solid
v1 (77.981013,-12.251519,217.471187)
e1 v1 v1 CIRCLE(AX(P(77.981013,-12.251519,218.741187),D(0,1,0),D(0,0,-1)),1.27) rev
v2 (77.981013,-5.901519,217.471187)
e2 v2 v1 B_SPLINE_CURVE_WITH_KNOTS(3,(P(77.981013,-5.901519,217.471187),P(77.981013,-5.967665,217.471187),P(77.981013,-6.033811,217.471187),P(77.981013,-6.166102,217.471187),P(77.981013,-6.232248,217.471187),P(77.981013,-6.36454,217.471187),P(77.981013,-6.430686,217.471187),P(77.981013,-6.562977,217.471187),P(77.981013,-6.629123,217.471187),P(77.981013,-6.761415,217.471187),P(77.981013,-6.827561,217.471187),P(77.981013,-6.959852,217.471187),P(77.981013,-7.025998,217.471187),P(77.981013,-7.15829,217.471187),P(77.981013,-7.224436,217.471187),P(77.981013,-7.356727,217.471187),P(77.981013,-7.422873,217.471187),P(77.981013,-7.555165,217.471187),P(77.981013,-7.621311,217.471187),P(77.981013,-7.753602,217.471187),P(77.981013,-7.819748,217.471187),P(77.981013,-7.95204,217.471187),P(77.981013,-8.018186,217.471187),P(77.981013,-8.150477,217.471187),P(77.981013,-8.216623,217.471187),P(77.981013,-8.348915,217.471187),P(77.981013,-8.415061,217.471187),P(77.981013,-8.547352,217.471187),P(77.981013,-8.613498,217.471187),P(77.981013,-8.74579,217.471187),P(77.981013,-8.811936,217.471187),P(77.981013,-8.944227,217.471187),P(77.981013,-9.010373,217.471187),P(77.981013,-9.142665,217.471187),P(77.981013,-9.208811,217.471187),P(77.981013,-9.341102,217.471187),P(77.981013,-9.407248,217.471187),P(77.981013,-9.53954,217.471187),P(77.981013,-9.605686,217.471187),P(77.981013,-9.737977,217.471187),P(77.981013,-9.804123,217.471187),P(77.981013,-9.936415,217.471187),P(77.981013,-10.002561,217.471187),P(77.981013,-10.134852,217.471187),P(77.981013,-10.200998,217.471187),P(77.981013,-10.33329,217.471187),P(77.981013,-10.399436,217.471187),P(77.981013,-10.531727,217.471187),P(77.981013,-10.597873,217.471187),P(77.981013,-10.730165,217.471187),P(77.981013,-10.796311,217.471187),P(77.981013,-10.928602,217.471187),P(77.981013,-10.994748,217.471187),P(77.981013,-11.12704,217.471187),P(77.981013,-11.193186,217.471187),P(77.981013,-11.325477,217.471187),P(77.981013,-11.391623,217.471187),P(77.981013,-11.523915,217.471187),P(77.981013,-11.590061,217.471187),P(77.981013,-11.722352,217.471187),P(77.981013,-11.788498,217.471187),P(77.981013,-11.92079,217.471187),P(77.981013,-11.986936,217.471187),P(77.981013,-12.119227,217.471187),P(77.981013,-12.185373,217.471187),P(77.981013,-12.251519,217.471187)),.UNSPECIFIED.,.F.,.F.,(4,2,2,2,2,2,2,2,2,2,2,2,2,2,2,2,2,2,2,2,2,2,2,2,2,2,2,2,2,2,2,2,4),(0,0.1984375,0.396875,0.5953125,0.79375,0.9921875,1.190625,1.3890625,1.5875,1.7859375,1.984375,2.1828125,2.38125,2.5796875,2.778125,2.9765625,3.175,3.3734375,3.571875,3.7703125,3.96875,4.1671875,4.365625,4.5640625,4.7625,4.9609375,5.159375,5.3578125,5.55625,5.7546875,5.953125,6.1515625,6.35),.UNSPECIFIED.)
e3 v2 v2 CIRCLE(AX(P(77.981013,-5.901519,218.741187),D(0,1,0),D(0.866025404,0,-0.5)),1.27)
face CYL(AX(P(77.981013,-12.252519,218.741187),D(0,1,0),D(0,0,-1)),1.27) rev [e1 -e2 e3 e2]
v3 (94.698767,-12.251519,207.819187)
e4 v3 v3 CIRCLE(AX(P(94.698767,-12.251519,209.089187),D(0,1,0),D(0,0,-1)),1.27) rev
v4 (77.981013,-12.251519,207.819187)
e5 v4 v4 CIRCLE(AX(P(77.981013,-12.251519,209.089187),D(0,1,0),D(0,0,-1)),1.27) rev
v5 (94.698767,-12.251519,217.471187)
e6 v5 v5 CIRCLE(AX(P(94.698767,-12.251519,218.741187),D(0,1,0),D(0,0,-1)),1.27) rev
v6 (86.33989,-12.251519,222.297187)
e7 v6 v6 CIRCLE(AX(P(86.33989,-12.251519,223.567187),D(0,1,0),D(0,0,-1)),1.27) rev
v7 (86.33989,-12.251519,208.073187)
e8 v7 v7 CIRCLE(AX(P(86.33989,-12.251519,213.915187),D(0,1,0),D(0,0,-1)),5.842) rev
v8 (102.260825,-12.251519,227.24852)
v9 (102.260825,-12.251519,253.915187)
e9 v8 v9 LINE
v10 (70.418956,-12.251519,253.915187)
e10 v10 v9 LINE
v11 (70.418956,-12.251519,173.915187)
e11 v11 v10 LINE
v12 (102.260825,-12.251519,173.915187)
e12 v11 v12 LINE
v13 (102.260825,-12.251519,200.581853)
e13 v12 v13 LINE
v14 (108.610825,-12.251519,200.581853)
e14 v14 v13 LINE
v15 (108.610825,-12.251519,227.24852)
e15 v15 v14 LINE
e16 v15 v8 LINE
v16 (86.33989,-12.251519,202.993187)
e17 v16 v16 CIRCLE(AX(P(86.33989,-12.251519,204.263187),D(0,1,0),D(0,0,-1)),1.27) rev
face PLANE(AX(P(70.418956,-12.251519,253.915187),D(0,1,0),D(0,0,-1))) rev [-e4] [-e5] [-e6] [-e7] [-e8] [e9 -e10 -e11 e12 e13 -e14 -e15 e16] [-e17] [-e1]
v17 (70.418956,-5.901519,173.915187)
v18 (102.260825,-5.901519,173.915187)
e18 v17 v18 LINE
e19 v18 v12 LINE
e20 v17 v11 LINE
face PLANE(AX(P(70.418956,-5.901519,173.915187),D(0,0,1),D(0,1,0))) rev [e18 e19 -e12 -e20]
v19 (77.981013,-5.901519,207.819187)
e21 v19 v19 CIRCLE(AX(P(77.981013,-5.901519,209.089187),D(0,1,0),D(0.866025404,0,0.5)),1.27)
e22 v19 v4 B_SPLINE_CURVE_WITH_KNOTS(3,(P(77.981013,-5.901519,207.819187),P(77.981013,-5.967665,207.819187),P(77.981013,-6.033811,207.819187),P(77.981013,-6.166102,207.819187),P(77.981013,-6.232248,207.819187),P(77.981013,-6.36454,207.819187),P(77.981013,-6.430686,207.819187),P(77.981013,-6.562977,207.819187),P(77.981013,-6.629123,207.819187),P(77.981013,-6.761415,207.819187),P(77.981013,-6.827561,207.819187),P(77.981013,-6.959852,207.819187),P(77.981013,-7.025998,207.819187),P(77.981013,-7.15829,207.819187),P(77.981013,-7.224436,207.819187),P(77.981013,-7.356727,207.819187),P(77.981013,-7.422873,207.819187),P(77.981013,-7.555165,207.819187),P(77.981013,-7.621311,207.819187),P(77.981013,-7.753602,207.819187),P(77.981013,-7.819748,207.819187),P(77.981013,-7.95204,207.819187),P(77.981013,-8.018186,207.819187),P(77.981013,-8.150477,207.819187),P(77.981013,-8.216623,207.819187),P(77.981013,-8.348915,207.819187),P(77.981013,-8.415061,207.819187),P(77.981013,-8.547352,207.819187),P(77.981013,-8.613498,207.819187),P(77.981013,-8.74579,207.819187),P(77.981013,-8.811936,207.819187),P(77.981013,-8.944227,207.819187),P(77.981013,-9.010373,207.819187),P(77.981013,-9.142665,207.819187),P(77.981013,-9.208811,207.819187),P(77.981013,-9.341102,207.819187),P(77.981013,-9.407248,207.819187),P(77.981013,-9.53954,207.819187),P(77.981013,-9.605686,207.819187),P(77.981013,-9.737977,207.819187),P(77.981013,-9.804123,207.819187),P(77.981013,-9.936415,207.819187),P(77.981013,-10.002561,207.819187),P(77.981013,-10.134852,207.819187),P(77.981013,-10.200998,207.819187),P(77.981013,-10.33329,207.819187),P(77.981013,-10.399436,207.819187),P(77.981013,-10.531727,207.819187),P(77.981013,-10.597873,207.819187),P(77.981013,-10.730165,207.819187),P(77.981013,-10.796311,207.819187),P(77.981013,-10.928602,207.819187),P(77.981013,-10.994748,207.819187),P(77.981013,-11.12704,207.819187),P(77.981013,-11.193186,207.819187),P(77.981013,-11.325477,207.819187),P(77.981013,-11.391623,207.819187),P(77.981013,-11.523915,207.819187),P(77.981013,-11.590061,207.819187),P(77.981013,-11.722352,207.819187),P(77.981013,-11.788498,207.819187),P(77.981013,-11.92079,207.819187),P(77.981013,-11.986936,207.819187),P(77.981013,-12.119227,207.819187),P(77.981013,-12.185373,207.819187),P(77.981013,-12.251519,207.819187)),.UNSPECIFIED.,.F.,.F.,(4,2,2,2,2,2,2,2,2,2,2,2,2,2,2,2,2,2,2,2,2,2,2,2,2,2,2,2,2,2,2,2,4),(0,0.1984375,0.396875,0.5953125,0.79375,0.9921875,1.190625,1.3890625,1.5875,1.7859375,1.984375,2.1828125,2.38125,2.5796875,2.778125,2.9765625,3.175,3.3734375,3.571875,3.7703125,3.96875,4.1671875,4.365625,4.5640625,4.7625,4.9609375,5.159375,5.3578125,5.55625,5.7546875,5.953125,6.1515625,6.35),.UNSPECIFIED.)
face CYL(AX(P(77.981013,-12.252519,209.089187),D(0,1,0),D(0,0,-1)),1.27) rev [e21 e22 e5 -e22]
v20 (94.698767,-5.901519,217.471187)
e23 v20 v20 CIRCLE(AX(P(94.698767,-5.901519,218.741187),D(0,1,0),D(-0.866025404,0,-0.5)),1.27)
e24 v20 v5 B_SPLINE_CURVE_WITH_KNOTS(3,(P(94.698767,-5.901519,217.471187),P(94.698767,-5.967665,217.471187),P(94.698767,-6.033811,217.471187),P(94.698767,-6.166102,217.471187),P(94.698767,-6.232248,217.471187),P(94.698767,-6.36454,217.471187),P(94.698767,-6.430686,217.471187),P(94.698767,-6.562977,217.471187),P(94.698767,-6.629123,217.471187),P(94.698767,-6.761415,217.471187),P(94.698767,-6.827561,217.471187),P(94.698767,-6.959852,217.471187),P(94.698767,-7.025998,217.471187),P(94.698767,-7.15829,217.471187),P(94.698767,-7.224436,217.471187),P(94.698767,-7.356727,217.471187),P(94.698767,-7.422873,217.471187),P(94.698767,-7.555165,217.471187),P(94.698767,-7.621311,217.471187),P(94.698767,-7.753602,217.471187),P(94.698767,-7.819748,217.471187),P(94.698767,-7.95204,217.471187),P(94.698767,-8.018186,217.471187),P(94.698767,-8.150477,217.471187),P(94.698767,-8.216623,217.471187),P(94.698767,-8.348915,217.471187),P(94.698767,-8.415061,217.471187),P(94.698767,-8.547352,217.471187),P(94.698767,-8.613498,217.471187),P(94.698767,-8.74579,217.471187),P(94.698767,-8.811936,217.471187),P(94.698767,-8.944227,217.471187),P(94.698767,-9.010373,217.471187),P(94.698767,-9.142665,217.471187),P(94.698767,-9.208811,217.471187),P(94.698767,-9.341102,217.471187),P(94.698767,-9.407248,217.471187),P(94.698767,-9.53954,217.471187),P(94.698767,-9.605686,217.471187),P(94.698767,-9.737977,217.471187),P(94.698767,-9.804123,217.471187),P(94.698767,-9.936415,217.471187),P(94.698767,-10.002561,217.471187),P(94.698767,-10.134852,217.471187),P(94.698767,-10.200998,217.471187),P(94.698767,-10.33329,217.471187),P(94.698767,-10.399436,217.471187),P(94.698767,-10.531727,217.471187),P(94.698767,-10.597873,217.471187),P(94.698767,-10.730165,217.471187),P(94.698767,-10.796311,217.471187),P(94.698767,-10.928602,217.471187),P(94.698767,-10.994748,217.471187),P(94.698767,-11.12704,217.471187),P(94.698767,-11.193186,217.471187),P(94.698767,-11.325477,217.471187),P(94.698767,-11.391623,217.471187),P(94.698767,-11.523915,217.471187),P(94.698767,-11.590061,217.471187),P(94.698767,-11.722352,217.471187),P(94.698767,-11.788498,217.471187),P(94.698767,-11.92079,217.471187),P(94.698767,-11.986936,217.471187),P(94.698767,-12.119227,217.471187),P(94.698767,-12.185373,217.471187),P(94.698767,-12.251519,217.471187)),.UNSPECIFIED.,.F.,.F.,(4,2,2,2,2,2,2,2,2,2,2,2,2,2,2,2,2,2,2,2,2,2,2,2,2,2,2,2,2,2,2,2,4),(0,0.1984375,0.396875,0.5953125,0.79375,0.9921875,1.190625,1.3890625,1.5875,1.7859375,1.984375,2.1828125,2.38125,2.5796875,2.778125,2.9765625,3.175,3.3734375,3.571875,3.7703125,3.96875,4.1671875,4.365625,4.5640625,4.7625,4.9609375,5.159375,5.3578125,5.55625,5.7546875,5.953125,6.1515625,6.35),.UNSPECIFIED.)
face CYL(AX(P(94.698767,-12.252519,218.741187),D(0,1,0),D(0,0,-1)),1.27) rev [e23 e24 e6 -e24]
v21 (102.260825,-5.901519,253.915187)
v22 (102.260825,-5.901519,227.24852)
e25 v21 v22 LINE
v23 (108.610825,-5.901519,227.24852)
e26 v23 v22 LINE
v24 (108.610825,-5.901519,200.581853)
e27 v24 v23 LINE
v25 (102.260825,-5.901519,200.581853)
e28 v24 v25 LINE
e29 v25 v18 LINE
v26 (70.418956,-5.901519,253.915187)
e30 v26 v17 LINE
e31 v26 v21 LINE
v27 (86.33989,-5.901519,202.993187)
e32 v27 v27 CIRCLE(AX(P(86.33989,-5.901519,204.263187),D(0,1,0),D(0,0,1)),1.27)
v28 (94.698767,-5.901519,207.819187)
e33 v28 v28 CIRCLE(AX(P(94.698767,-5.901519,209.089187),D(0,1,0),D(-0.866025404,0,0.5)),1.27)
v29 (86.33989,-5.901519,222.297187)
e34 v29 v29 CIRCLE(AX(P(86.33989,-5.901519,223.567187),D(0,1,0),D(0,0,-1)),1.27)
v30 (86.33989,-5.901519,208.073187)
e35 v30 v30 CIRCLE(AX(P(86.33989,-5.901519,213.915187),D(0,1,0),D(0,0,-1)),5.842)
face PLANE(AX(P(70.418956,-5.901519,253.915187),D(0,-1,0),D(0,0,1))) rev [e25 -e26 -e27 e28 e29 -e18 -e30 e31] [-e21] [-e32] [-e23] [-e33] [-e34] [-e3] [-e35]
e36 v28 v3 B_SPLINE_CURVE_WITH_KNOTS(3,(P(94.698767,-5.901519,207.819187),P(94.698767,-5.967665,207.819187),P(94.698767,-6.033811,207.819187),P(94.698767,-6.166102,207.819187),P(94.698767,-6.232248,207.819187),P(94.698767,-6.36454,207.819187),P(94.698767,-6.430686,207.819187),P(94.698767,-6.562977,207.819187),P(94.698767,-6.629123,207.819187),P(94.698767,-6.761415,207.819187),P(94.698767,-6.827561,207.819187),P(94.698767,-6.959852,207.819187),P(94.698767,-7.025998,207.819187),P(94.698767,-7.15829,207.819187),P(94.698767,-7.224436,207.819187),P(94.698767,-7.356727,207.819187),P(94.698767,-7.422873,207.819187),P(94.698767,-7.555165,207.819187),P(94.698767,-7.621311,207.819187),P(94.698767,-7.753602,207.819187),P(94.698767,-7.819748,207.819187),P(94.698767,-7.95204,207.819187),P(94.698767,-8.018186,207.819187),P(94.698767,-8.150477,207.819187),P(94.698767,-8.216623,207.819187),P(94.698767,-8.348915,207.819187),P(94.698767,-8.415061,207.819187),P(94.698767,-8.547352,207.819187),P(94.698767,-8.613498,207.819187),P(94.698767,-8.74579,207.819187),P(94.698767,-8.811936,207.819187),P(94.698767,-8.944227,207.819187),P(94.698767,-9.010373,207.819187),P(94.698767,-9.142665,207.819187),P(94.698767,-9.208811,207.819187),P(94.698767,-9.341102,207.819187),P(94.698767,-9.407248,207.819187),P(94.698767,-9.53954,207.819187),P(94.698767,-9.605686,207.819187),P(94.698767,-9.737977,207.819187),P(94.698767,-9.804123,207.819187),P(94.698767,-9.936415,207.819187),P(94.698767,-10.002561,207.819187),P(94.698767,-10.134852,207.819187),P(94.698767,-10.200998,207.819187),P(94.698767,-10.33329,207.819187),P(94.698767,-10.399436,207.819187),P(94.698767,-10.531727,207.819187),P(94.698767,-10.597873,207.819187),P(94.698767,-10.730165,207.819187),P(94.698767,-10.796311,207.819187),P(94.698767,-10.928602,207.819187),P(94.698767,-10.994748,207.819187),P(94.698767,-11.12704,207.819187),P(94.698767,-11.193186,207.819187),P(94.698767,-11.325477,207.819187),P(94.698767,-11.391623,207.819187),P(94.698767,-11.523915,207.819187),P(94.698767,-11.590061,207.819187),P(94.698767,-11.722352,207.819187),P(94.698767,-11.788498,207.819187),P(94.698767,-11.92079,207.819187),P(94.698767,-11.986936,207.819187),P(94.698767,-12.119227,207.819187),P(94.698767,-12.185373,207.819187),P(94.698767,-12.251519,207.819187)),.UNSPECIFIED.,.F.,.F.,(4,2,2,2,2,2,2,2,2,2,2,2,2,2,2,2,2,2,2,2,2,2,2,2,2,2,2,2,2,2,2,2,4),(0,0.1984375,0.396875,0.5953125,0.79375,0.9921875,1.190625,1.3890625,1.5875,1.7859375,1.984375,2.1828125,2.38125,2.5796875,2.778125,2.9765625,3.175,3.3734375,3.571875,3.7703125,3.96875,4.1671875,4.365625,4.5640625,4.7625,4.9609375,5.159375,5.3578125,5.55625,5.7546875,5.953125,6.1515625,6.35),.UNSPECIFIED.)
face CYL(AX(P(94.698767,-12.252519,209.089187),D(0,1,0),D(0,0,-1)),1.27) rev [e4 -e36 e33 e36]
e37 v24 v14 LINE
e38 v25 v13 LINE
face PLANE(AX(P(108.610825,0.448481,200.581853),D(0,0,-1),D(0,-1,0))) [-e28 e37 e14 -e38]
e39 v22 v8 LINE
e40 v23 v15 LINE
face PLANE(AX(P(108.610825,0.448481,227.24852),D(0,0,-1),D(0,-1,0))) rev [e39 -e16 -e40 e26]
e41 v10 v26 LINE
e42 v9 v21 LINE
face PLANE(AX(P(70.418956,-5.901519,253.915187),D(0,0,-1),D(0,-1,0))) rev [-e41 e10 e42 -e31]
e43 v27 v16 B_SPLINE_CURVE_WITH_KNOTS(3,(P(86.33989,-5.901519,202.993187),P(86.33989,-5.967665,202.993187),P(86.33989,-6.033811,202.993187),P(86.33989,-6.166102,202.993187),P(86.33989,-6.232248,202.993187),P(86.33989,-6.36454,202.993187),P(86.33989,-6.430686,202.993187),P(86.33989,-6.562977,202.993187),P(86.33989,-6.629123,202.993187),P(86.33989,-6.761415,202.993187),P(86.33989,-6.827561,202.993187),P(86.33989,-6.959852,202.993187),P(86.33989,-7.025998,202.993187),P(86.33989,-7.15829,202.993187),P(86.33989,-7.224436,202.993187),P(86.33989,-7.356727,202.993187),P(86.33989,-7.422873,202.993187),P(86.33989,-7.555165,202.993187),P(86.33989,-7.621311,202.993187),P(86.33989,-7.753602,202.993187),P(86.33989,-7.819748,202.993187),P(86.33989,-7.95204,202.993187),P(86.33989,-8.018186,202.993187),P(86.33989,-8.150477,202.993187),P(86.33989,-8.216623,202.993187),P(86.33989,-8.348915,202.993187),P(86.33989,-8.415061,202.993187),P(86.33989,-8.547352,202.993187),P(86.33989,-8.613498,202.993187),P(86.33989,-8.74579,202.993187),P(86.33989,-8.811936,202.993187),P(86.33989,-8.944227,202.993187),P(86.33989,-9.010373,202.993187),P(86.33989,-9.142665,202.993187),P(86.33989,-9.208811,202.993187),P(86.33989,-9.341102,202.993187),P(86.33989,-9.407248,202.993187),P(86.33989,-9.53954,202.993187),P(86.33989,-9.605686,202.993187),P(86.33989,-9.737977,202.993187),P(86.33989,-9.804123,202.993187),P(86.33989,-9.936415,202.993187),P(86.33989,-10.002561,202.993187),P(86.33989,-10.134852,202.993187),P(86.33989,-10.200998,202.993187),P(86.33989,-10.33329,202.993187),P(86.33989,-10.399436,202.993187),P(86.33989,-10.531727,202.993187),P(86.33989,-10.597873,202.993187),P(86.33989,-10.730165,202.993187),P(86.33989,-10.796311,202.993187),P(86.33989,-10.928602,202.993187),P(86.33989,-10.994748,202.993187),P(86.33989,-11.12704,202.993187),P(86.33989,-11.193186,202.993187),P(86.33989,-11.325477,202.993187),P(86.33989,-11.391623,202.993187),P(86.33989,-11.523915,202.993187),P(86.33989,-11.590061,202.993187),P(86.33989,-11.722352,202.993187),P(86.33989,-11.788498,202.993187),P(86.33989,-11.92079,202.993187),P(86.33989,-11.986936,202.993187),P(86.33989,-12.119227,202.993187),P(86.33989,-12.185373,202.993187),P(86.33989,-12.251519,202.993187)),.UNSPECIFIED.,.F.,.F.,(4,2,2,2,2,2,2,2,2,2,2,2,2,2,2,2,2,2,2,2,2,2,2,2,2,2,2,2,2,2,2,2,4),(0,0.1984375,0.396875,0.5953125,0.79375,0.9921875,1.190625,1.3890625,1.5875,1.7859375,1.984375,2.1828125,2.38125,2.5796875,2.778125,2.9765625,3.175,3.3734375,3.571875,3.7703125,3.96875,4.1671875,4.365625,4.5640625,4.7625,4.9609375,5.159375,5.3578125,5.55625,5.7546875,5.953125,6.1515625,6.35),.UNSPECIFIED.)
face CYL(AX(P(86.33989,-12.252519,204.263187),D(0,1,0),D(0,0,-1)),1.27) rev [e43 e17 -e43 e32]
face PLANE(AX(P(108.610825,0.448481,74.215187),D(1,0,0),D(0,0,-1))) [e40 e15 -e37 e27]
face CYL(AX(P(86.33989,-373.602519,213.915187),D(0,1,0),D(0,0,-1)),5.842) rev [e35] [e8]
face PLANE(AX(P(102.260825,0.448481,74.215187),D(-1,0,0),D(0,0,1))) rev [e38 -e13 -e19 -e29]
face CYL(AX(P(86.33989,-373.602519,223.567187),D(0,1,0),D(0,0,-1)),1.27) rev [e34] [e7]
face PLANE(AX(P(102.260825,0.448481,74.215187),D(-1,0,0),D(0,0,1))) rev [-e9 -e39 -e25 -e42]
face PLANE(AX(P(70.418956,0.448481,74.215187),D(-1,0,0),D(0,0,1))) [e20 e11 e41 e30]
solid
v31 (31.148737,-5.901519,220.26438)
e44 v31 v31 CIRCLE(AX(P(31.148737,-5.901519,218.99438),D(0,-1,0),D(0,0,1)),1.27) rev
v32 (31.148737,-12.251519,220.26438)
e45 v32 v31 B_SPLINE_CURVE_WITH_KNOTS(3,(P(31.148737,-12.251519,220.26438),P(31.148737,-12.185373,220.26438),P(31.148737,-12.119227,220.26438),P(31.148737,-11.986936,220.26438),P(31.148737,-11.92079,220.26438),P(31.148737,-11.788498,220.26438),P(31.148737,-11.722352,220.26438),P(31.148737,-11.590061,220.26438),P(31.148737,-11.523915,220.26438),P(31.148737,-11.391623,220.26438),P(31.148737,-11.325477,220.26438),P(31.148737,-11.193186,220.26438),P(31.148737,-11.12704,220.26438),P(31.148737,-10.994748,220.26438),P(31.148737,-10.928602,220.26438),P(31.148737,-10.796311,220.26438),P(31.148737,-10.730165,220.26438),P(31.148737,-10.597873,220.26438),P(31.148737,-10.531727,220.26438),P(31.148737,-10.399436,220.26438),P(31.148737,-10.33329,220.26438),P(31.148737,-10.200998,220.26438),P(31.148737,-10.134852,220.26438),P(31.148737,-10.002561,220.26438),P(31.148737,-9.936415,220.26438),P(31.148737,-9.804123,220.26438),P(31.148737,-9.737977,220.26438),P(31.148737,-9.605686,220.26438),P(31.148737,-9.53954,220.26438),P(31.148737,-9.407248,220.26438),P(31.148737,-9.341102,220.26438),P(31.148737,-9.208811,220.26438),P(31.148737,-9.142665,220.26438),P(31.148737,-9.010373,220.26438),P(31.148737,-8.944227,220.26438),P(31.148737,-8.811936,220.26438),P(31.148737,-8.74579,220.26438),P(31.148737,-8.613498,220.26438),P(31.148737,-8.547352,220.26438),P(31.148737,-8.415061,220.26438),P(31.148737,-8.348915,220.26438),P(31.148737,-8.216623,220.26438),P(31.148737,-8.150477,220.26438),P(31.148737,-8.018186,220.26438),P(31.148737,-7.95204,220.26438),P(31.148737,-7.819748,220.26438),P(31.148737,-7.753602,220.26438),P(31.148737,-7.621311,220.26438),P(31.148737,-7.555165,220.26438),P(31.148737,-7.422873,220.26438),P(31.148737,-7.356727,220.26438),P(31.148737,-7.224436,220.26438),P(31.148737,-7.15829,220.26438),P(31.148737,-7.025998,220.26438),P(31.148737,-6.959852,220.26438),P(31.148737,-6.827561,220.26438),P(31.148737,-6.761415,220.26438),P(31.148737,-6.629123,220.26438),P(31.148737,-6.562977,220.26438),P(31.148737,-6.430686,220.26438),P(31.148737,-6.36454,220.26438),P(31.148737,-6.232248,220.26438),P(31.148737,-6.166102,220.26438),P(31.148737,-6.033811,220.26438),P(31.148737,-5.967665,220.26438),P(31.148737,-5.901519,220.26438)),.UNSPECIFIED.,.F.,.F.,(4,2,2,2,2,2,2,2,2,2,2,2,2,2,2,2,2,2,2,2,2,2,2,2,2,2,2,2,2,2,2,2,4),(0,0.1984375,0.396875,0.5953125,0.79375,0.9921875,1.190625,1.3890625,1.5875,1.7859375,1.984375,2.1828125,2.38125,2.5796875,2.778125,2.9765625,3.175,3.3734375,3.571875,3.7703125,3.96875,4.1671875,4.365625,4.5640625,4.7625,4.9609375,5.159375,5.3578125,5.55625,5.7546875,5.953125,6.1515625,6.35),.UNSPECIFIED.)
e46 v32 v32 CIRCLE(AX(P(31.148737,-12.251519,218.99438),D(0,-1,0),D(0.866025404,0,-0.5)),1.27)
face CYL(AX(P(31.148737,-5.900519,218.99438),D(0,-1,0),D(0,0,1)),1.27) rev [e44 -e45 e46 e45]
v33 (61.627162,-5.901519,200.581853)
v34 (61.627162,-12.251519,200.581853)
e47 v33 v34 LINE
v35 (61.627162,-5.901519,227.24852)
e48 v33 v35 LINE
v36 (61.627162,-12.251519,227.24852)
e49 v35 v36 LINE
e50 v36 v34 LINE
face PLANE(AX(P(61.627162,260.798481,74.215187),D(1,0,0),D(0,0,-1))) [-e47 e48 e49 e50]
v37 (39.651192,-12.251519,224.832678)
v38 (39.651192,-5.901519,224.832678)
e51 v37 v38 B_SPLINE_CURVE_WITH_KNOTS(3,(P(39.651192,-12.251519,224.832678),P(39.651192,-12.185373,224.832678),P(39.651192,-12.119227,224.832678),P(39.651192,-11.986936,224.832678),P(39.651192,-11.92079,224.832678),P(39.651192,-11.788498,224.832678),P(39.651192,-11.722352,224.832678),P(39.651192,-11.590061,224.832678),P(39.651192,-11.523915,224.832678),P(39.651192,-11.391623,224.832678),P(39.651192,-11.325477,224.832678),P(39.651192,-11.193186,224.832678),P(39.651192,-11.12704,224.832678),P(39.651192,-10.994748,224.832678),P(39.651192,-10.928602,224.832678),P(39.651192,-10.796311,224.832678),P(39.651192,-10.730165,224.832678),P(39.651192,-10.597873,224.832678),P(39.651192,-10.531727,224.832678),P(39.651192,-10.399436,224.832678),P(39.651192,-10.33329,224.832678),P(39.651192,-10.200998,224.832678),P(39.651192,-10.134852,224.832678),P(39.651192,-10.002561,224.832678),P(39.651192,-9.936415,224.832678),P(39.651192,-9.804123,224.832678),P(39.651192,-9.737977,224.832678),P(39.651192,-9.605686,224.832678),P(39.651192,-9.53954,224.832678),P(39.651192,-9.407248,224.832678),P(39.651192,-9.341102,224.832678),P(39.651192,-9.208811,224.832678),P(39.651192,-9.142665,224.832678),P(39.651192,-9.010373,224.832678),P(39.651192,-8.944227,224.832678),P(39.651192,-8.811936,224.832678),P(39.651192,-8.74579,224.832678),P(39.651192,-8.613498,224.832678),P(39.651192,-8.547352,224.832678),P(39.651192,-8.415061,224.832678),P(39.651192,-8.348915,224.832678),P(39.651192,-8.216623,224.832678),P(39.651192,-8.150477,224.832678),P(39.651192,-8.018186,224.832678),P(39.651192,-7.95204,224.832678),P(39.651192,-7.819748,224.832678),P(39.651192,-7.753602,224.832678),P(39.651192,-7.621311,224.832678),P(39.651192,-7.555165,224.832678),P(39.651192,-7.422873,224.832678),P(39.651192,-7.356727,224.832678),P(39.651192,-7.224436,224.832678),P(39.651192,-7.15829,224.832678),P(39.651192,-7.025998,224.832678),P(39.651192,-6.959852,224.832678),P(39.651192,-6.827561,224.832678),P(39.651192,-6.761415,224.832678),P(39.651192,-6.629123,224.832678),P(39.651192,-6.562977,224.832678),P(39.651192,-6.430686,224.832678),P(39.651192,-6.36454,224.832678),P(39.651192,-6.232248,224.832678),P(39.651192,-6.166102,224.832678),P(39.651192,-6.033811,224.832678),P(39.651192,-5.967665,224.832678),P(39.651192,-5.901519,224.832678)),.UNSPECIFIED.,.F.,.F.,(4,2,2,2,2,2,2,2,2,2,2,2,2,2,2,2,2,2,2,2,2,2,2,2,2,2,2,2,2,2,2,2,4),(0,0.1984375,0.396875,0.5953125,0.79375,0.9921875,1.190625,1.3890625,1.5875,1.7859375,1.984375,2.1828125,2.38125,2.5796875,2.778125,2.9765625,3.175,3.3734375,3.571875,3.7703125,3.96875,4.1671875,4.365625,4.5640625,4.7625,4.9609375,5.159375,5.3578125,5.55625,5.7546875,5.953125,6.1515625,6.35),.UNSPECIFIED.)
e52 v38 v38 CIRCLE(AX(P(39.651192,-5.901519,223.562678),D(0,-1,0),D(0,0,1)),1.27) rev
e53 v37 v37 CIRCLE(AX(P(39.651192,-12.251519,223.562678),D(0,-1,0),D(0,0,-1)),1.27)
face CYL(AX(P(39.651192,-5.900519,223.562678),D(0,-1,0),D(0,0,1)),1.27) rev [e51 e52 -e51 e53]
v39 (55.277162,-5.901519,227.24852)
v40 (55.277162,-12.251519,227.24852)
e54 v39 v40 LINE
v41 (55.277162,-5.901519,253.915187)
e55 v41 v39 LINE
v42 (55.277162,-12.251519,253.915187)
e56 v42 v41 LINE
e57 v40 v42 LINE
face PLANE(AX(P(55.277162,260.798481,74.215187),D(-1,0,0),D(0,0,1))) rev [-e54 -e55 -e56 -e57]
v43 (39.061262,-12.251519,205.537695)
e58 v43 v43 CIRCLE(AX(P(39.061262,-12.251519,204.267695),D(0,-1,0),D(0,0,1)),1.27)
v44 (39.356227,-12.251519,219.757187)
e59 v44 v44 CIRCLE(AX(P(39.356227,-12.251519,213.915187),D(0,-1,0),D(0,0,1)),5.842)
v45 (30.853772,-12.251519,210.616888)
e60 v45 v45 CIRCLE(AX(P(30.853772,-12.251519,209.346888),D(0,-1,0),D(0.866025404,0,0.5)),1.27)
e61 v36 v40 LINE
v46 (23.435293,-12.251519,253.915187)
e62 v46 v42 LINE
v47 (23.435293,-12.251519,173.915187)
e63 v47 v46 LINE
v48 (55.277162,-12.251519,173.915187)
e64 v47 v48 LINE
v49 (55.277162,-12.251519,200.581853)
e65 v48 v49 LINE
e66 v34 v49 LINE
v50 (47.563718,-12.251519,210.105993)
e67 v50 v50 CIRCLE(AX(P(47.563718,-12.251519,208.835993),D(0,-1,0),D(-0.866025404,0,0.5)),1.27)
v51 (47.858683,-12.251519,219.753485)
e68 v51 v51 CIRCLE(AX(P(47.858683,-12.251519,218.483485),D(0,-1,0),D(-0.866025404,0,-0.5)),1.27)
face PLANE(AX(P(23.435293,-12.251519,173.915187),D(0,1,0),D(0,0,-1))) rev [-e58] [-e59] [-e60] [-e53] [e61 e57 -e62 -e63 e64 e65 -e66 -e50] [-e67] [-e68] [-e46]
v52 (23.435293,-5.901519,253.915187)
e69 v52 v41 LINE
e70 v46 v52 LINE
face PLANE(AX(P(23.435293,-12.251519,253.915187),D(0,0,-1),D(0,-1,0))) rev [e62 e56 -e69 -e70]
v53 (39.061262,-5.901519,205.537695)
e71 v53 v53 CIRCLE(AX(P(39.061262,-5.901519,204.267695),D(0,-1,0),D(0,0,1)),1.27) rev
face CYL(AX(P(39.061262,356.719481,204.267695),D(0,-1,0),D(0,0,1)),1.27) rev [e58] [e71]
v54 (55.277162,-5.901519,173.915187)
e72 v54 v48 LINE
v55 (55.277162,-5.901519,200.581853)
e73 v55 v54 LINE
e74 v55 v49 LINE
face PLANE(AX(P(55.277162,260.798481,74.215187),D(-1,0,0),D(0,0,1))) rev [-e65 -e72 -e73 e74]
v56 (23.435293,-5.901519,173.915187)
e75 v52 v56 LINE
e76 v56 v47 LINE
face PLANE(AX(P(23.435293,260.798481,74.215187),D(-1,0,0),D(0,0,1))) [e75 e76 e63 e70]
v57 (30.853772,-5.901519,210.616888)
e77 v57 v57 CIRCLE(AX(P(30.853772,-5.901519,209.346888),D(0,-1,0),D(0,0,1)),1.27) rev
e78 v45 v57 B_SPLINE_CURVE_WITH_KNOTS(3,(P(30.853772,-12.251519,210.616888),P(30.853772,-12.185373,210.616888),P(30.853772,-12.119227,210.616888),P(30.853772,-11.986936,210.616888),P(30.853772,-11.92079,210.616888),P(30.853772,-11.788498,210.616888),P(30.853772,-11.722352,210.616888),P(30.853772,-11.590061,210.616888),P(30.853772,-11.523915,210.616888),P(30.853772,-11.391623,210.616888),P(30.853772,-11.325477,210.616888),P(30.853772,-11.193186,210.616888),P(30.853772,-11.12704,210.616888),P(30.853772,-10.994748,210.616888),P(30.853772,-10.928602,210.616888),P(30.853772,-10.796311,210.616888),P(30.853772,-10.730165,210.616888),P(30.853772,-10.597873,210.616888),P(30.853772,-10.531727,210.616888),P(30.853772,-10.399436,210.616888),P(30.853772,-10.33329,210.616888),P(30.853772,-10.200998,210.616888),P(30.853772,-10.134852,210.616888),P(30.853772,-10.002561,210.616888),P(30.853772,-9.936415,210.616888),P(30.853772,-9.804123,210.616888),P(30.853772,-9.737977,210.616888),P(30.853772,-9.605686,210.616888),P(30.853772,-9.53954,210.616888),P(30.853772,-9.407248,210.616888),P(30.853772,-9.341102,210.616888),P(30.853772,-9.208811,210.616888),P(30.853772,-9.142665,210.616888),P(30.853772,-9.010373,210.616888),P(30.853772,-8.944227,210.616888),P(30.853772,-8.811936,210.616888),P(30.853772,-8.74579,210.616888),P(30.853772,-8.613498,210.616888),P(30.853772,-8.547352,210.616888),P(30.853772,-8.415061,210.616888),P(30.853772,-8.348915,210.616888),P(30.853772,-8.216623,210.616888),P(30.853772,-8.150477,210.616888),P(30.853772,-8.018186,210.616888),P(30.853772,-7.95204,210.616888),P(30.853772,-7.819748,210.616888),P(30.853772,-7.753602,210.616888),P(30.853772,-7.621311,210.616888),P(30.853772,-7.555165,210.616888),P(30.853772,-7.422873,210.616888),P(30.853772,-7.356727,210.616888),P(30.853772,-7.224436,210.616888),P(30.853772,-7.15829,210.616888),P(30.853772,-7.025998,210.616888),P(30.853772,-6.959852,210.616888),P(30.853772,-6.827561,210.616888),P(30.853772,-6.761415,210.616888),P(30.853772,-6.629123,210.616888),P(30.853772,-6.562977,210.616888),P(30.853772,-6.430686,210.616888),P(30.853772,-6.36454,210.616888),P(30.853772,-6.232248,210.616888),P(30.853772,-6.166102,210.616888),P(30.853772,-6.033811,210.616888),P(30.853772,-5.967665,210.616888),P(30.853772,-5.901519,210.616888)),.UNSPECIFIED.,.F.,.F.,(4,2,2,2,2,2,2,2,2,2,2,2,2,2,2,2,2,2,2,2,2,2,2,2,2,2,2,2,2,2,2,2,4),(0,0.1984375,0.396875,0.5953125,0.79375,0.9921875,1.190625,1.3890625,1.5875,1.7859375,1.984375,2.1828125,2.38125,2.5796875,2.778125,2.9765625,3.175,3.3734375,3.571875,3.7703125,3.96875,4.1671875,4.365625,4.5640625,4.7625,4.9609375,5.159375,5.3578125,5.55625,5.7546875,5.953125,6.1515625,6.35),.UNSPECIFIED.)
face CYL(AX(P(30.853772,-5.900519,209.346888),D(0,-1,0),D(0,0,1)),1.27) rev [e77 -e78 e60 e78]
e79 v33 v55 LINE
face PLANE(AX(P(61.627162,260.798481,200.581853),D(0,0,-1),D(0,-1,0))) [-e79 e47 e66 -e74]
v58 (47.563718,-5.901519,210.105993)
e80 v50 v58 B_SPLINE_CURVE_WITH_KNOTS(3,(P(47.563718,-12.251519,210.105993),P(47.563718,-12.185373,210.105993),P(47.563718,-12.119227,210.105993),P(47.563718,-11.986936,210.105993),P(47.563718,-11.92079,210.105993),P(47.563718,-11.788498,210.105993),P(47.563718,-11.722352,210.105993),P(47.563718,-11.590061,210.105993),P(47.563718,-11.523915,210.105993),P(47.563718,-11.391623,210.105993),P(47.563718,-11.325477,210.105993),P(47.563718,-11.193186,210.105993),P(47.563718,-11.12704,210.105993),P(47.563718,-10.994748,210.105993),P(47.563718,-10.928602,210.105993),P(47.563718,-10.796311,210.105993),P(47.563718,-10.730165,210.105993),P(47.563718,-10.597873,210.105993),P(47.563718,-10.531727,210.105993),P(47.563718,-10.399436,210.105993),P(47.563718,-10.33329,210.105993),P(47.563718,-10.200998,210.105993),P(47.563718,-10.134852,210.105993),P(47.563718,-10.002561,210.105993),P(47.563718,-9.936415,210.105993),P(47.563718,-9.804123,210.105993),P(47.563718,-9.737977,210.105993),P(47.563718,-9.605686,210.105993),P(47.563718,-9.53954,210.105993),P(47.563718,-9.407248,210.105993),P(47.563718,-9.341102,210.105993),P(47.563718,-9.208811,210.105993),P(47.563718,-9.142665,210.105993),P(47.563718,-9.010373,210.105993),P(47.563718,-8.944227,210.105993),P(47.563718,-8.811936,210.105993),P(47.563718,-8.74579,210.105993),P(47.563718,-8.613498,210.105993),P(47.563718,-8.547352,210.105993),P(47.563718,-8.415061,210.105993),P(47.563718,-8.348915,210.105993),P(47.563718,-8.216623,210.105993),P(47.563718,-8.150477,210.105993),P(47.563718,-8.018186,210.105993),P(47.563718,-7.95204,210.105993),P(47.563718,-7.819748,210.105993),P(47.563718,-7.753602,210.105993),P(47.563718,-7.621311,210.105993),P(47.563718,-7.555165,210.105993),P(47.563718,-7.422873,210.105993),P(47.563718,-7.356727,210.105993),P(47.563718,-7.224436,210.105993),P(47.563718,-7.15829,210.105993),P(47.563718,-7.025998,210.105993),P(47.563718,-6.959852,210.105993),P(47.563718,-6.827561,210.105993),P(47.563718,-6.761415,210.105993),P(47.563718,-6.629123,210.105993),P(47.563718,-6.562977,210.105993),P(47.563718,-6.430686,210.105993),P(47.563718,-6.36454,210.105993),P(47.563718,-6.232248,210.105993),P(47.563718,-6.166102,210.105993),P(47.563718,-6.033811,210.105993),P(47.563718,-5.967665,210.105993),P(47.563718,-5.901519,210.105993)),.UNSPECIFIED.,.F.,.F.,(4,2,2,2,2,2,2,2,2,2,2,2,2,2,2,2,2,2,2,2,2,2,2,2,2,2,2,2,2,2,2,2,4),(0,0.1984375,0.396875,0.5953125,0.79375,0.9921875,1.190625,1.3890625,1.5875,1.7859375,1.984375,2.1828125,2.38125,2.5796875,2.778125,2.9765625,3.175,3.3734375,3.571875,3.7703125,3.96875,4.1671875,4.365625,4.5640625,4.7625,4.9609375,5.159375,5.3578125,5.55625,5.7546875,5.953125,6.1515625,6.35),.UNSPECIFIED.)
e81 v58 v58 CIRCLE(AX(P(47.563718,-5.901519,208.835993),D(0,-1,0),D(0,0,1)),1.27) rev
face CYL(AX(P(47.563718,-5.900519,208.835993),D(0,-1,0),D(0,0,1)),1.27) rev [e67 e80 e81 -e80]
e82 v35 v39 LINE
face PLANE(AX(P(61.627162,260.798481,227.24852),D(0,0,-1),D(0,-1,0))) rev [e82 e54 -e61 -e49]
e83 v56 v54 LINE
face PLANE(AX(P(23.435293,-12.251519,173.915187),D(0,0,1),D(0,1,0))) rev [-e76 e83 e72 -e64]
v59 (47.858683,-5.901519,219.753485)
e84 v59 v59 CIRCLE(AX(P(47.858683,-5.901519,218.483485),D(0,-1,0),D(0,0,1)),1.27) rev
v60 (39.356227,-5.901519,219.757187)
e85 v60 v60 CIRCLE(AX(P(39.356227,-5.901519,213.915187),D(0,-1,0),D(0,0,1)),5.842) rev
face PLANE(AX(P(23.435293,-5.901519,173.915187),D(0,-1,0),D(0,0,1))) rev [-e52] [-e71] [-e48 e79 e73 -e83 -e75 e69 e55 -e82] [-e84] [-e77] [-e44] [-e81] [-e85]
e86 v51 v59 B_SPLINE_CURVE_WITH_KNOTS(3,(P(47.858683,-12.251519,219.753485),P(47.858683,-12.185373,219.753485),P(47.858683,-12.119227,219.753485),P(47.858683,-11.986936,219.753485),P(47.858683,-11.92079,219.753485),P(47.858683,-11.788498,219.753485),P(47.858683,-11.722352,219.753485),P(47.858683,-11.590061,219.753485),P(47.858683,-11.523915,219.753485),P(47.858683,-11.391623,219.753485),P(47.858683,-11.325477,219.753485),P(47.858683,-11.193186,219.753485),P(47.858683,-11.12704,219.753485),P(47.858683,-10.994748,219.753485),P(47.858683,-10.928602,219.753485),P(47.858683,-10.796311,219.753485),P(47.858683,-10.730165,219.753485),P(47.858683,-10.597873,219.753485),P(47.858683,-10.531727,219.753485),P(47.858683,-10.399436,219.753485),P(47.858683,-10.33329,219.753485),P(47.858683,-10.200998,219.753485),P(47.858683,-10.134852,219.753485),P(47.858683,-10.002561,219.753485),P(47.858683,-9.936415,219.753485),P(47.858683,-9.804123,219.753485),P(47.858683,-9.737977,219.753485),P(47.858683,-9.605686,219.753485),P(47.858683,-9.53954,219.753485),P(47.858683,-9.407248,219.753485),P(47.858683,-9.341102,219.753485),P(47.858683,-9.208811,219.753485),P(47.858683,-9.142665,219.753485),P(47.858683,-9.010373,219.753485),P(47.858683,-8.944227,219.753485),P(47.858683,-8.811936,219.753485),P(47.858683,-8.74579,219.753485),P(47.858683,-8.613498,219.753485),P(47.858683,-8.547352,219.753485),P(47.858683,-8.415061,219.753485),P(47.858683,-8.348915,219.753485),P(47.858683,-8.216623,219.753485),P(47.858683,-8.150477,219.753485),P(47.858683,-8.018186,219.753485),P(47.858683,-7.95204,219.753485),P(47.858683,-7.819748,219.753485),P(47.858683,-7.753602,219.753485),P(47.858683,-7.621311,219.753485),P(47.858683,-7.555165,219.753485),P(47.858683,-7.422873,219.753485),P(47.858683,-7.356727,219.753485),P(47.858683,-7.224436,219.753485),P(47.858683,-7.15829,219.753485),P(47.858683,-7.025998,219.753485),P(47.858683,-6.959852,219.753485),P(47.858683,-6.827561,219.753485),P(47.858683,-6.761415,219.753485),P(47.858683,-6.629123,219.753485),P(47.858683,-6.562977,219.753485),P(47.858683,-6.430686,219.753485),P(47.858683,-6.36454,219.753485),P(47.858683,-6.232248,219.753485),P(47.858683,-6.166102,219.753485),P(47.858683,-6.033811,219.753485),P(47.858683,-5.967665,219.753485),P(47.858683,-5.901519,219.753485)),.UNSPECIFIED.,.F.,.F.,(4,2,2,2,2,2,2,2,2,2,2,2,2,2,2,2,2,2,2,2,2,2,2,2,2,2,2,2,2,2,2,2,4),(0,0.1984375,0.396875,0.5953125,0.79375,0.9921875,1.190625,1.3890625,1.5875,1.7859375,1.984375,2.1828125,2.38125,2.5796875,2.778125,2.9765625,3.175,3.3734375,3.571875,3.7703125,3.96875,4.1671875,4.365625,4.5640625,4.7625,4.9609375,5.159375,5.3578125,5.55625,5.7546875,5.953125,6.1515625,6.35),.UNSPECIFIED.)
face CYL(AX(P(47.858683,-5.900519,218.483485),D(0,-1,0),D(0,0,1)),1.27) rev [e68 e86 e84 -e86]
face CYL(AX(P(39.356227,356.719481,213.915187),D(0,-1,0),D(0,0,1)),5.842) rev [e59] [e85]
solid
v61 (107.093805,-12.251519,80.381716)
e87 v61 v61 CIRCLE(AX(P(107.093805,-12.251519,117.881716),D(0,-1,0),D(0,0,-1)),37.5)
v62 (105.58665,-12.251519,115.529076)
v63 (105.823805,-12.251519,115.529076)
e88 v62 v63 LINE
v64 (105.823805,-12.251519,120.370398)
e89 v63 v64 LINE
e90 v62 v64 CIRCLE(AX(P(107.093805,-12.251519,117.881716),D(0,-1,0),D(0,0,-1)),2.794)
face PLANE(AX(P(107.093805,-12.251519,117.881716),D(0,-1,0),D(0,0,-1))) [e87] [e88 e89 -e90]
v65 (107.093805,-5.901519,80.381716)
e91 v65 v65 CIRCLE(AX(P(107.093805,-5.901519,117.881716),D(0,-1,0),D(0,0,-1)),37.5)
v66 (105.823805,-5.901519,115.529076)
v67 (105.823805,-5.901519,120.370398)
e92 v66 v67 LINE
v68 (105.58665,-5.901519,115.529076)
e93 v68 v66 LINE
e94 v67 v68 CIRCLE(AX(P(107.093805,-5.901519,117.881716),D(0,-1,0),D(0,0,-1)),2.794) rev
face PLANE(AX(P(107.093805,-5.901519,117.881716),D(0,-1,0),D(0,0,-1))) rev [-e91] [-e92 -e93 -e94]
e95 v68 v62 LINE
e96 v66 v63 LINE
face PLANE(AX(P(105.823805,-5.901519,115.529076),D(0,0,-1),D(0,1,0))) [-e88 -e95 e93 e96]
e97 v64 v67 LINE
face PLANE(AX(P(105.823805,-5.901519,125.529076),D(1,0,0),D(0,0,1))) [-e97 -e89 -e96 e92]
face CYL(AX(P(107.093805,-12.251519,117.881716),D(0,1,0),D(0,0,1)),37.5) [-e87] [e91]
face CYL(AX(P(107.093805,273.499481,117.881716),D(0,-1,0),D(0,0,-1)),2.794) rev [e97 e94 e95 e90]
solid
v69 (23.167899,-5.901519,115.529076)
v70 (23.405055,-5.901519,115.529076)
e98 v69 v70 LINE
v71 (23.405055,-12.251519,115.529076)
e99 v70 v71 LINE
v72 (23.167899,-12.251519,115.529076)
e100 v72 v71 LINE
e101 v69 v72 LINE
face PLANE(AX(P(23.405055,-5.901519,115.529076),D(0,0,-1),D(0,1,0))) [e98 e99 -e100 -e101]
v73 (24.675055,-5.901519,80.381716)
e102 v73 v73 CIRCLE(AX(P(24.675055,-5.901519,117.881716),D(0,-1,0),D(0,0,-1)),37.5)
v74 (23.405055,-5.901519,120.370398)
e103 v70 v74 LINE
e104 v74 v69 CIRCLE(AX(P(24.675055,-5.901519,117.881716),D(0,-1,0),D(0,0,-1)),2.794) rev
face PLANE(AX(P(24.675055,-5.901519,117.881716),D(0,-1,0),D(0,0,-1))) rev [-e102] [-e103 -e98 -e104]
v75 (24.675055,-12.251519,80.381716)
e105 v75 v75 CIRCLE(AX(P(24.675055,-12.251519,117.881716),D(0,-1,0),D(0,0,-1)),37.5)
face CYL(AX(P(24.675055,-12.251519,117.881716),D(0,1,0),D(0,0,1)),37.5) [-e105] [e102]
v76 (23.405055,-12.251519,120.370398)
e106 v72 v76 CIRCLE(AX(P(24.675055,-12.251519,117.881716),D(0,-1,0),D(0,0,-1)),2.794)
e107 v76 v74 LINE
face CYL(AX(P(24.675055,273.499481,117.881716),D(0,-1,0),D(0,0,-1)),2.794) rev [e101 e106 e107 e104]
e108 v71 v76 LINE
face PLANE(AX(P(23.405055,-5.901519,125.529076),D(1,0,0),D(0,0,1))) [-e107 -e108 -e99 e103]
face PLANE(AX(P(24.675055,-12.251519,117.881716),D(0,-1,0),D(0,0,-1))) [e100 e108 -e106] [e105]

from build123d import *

# Parameters (mm, degrees)
MOTORIZED_START                      = -12.251519109
MOTORIZED_PLATFORM_MDF_OUTLINE_R     = 1.27
MOTORIZED_PLATFORM_MDF_OUTLINE_R_2   = 5.842
MOTORIZED_PLATFORM_MDF_DEPTH         = 6.35
MOTORIZED_PLATFORM_MDF_2_OUTLINE_R   = 37.5
MOTORIZED_PLATFORM_MDF_2_DEPTH       = 6.35
MOTORIZED_PLATFORM_MDF_3_OUTLINE_R   = 1.27
MOTORIZED_PLATFORM_MDF_3_OUTLINE_R_2 = 5.842
MOTORIZED_PLATFORM_MDF_3_DEPTH       = 6.35
MOTORIZED_START_2                    = -12.251519108
MOTORIZED_PLATFORM_MDF_4_OUTLINE_R   = 37.5
MOTORIZED_PLATFORM_MDF_4_DEPTH       = 6.35
MOTORIZED_PLATFORM_MDF_5_OUTLINE_W   = 6.35
MOTORIZED_PLATFORM_MDF_5_OUTLINE_H   = 8.382
MOTORIZED_PLATFORM_MDF_5_OUTLINE_H_2 = 4.7625
MOTORIZED_PLATFORM_MDF_5_OUTLINE_W_2 = 4.7625
MOTORIZED_PLATFORM_MDF_5_OUTLINE_H_3 = 6.35
MOTORIZED_PLATFORM_MDF_5_OUTLINE_R   = 3.175
MOTORIZED_PLATFORM_MDF_5_OUTLINE_R_2 = 12.7
MOTORIZED_PLATFORM_MDF_5_DEPTH       = 6.35
MOTORIZED_PLATFORM_MDF_6_DEPTH       = 6.35
MOTORIZED_PLATFORM_MDF_7_DEPTH       = 6.35
MOTORIZED_PLATFORM_MDF_8_DEPTH       = 6.35
MOTORIZED_PLATFORM_MDF_9_DEPTH       = 6.35


with BuildPart() as part:
    # Motorized Platform MDF: read off the stored shape, not the designer's step
    # Motorized Platform MDF outline → Motorized Platform MDF (new body)
    with BuildSketch(Plane(origin=(0, 0, 0), x_dir=(1, 0, 0), z_dir=(0, 1, 0)).offset(MOTORIZED_START)):
        Polygon((102.260824506, -253.915186521), (102.260824506, -227.248519855), (108.610824506, -227.248519855), (108.610824506, -200.581853188), (102.260824506, -200.581853188), (102.260824506, -173.915186521), (70.418955754, -173.915186521), (70.418955754, -253.915186521), align=None)
        with Locations((77.981012933, -218.741186531)):
            Circle(MOTORIZED_PLATFORM_MDF_OUTLINE_R, mode=Mode.SUBTRACT)
        with Locations((86.33989013, -223.567186531)):
            Circle(MOTORIZED_PLATFORM_MDF_OUTLINE_R, mode=Mode.SUBTRACT)
        with Locations((86.33989013, -213.915186531)):
            Circle(MOTORIZED_PLATFORM_MDF_OUTLINE_R_2, mode=Mode.SUBTRACT)
        with Locations((94.698767327, -218.741186531)):
            Circle(MOTORIZED_PLATFORM_MDF_OUTLINE_R, mode=Mode.SUBTRACT)
        with Locations((77.981012933, -209.089186531)):
            Circle(MOTORIZED_PLATFORM_MDF_OUTLINE_R, mode=Mode.SUBTRACT)
        with Locations((86.33989013, -204.263186531)):
            Circle(MOTORIZED_PLATFORM_MDF_OUTLINE_R, mode=Mode.SUBTRACT)
        with Locations((94.698767327, -209.089186531)):
            Circle(MOTORIZED_PLATFORM_MDF_OUTLINE_R, mode=Mode.SUBTRACT)
    extrude(amount=MOTORIZED_PLATFORM_MDF_DEPTH)


with BuildPart() as body_2:
    # Motorized Platform MDF 2 outline → Motorized Platform MDF 2 (new body)
    with BuildSketch(Plane(origin=(0, 0, 0), x_dir=(1.0, 1.07258646409036e-12, 0), z_dir=(-1.07258646409036e-12, 1.0, 0)).offset(MOTORIZED_START)):
        with Locations((122.488955754, -71.766463003)):
            Circle(MOTORIZED_PLATFORM_MDF_2_OUTLINE_R)
        with BuildLine():
            Line((121.218955754, -69.413822237), (120.981800344, -69.413822237))
            ThreePointArc((120.981800344, -69.413822237), (125.279609539, -71.629760962), (121.218955754, -74.255144582))
            Line((121.218955754, -74.255144582), (121.218955754, -69.413822237))
        make_face(mode=Mode.SUBTRACT)
    extrude(amount=MOTORIZED_PLATFORM_MDF_2_DEPTH)


with BuildPart() as body_3:
    # Motorized Platform MDF 3 outline → Motorized Platform MDF 3 (new body)
    with BuildSketch(Plane(origin=(0, 0, 0), x_dir=(1, 0, 0), z_dir=(0, 1, 0)).offset(MOTORIZED_START)):
        Polygon((-228.031044246, -253.915186521), (-228.031044246, -227.248519848), (-221.681044246, -227.248519848), (-221.681044246, -200.581853175), (-228.031044246, -200.581853175), (-228.031044246, -173.915186501), (-259.872912998, -173.915186501), (-259.872912998, -253.915186521), align=None)
        with Locations((-252.159469118, -218.99437973)):
            Circle(MOTORIZED_PLATFORM_MDF_3_OUTLINE_R, mode=Mode.SUBTRACT)
        with Locations((-243.657013512, -223.562678392)):
            Circle(MOTORIZED_PLATFORM_MDF_3_OUTLINE_R, mode=Mode.SUBTRACT)
        with Locations((-235.449523016, -218.483485173)):
            Circle(MOTORIZED_PLATFORM_MDF_3_OUTLINE_R, mode=Mode.SUBTRACT)
        with Locations((-252.454434228, -209.346887849)):
            Circle(MOTORIZED_PLATFORM_MDF_3_OUTLINE_R, mode=Mode.SUBTRACT)
        with Locations((-243.951978622, -213.915186511)):
            Circle(MOTORIZED_PLATFORM_MDF_3_OUTLINE_R_2, mode=Mode.SUBTRACT)
        with Locations((-244.246943732, -204.267694631)):
            Circle(MOTORIZED_PLATFORM_MDF_3_OUTLINE_R, mode=Mode.SUBTRACT)
        with Locations((-235.744488126, -208.835993293)):
            Circle(MOTORIZED_PLATFORM_MDF_3_OUTLINE_R, mode=Mode.SUBTRACT)
    extrude(amount=MOTORIZED_PLATFORM_MDF_3_DEPTH)


with BuildPart() as body_4:
    # Motorized Platform MDF 4 outline → Motorized Platform MDF 4 (new body)
    with BuildSketch(Plane(origin=(0, 0, 0), x_dir=(1.0, 1.07258646409036e-12, 0), z_dir=(-1.07258646409036e-12, 1.0, 0)).offset(MOTORIZED_START_2)):
        with Locations((-272.481044246, -71.766463003)):
            Circle(MOTORIZED_PLATFORM_MDF_4_OUTLINE_R)
        with BuildLine():
            Line((-273.751044246, -69.413822237), (-273.988199656, -69.413822237))
            ThreePointArc((-273.988199656, -69.413822237), (-269.69039046, -71.629760962), (-273.751044246, -74.255144582))
            Line((-273.751044246, -74.255144582), (-273.751044246, -69.413822237))
        make_face(mode=Mode.SUBTRACT)
    extrude(amount=MOTORIZED_PLATFORM_MDF_4_DEPTH)


with BuildPart() as body_5:
    # Motorized Platform MDF 5 outline → Motorized Platform MDF 5 (new body)
    with BuildSketch(Plane(origin=(0, 0, 0), x_dir=(1, 0, 0), z_dir=(0, 1, 0)).offset(MOTORIZED_START)):
        Polygon((-208.981044246, -127.548519858), (-208.981044246, -154.215186531), (-215.331044246, -154.215186531), (-215.331044246, -253.915186521), (64.068955754, -253.915186521), (64.068955754, -154.215186531), (57.718955754, -154.215186531), (57.718955754, -127.548519858), (51.368955754, -127.548519858), (51.368955754, -100.881853185), (57.718955754, -100.881853185), (57.718955754, -74.215186511), (64.068955754, -74.215186511), (64.068955754, 25.484813479), (-215.331044246, 25.484813479), (-215.331044246, -74.215186511), (-208.981044246, -74.215186511), (-208.981044246, -100.881853185), (-202.631044246, -100.881853185), (-202.631044246, -127.548519858), align=None)
        with Locations((-135.956044246, -230.674186521)):
            Rectangle(MOTORIZED_PLATFORM_MDF_5_OUTLINE_W, MOTORIZED_PLATFORM_MDF_5_OUTLINE_H, mode=Mode.SUBTRACT)
        Polygon((-113.797132761, -156.871403096), (-117.164728806, -160.238999142), (-121.654856867, -155.748871081), (-118.287260821, -152.381275036), align=None, mode=Mode.SUBTRACT)
        Polygon((-94.56808489, -168.229921702), (-96.390614737, -172.629897976), (-102.257249768, -170.19985818), (-100.434719921, -165.799881906), align=None, mode=Mode.SUBTRACT)
        Polygon((-127.215739631, -139.018862197), (-131.615715905, -140.841392043), (-134.0457557, -134.974757012), (-129.645779427, -133.152227165), align=None, mode=Mode.SUBTRACT)
        with Locations((-15.306044246, -230.674186521)):
            Rectangle(MOTORIZED_PLATFORM_MDF_5_OUTLINE_W, MOTORIZED_PLATFORM_MDF_5_OUTLINE_H, mode=Mode.SUBTRACT)
        with Locations((-75.631044246, -173.746436521)):
            Rectangle(MOTORIZED_PLATFORM_MDF_5_OUTLINE_W, MOTORIZED_PLATFORM_MDF_5_OUTLINE_H_2, mode=Mode.SUBTRACT)
        Polygon((-50.827368571, -165.799881906), (-49.004838724, -170.19985818), (-54.871473755, -172.629897976), (-56.694003602, -168.229921702), align=None, mode=Mode.SUBTRACT)
        Polygon((-32.974827671, -152.381275036), (-29.607231626, -155.748871081), (-34.097359686, -160.238999142), (-37.464955731, -156.871403096), align=None, mode=Mode.SUBTRACT)
        Polygon((-21.616309065, -133.152227165), (-17.216332792, -134.974757012), (-19.646372587, -140.841392043), (-24.046348861, -139.018862197), align=None, mode=Mode.SUBTRACT)
        with Locations((-135.162294246, -114.215186521)):
            Rectangle(MOTORIZED_PLATFORM_MDF_5_OUTLINE_W_2, MOTORIZED_PLATFORM_MDF_5_OUTLINE_H_3, mode=Mode.SUBTRACT)
        Polygon((-129.645779427, -95.278145877), (-134.0457557, -93.455616031), (-131.615715905, -87.588980999), (-127.215739631, -89.411510846), align=None, mode=Mode.SUBTRACT)
        Polygon((-118.287260821, -76.049098007), (-121.654856867, -72.681501961), (-117.164728806, -68.191373901), (-113.797132761, -71.558969946), align=None, mode=Mode.SUBTRACT)
        Polygon((-100.434719921, -62.630491136), (-102.257249768, -58.230514862), (-96.390614737, -55.800475067), (-94.56808489, -60.20045134), align=None, mode=Mode.SUBTRACT)
        with Locations((-107.381044246, -25.315186521)):
            Circle(MOTORIZED_PLATFORM_MDF_5_OUTLINE_R, mode=Mode.SUBTRACT)
        with Locations((-135.956044246, 2.243813479)):
            Rectangle(MOTORIZED_PLATFORM_MDF_5_OUTLINE_W, MOTORIZED_PLATFORM_MDF_5_OUTLINE_H, mode=Mode.SUBTRACT)
        with Locations((-107.381044246, 12.784813479)):
            Circle(MOTORIZED_PLATFORM_MDF_5_OUTLINE_R, mode=Mode.SUBTRACT)
        with Locations((-75.631044246, -114.215186521)):
            Circle(MOTORIZED_PLATFORM_MDF_5_OUTLINE_R_2, mode=Mode.SUBTRACT)
        with Locations((-16.099794246, -114.215186521)):
            Rectangle(MOTORIZED_PLATFORM_MDF_5_OUTLINE_W_2, MOTORIZED_PLATFORM_MDF_5_OUTLINE_H_3, mode=Mode.SUBTRACT)
        Polygon((-24.046348861, -89.411510846), (-19.646372587, -87.588980999), (-17.216332792, -93.455616031), (-21.616309065, -95.278145877), align=None, mode=Mode.SUBTRACT)
        with Locations((-75.631044246, -54.683936521)):
            Rectangle(MOTORIZED_PLATFORM_MDF_5_OUTLINE_W, MOTORIZED_PLATFORM_MDF_5_OUTLINE_H_2, mode=Mode.SUBTRACT)
        Polygon((-56.694003602, -60.20045134), (-54.871473755, -55.800475067), (-49.004838724, -58.230514862), (-50.827368571, -62.630491136), align=None, mode=Mode.SUBTRACT)
        Polygon((-37.464955731, -71.558969946), (-34.097359686, -68.191373901), (-29.607231626, -72.681501961), (-32.974827671, -76.049098007), align=None, mode=Mode.SUBTRACT)
        with Locations((-43.881044246, -25.315186521)):
            Circle(MOTORIZED_PLATFORM_MDF_5_OUTLINE_R, mode=Mode.SUBTRACT)
        with Locations((-43.881044246, 12.784813479)):
            Circle(MOTORIZED_PLATFORM_MDF_5_OUTLINE_R, mode=Mode.SUBTRACT)
        with Locations((-15.306044246, 2.243813479)):
            Rectangle(MOTORIZED_PLATFORM_MDF_5_OUTLINE_W, MOTORIZED_PLATFORM_MDF_5_OUTLINE_H, mode=Mode.SUBTRACT)
    extrude(amount=MOTORIZED_PLATFORM_MDF_5_DEPTH)


with BuildPart() as body_6:
    # Motorized Platform MDF 6 outline → Motorized Platform MDF 6 (new body)
    with BuildSketch(Plane(origin=(0, 0, 0), x_dir=(1, 0, 0), z_dir=(0, 1, 0)).offset(MOTORIZED_START)):
        with BuildLine():
            Line((97.935622421, 57.234813479), (106.402289087, 57.234813479))
            ThreePointArc((106.402289087, 57.234813479), (93.702289087, 69.934813479), (81.002289087, 57.234813479))
            Line((81.002289087, 57.234813479), (89.468955754, 57.234813479))
            Line((89.468955754, 57.234813479), (89.468955754, 50.884813479))
            Line((89.468955754, 50.884813479), (97.935622421, 50.884813479))
            Line((97.935622421, 50.884813479), (97.935622421, 57.234813479))
        make_face()
    extrude(amount=MOTORIZED_PLATFORM_MDF_6_DEPTH)


with BuildPart() as body_7:
    # Motorized Platform MDF 7 outline → Motorized Platform MDF 7 (new body)
    with BuildSketch(Plane(origin=(0, 0, 0), x_dir=(1, 0, 0), z_dir=(0, 1, 0)).offset(MOTORIZED_START)):
        with BuildLine():
            Line((-3.664377579, 57.234813479), (4.802289087, 57.234813479))
            ThreePointArc((4.802289087, 57.234813479), (-7.897710913, 69.934813479), (-20.597710913, 57.234813479))
            Line((-20.597710913, 57.234813479), (-12.131044246, 57.234813479))
            Line((-12.131044246, 57.234813479), (-12.131044246, 50.884813479))
            Line((-12.131044246, 50.884813479), (-3.664377579, 50.884813479))
            Line((-3.664377579, 50.884813479), (-3.664377579, 57.234813479))
        make_face()
    extrude(amount=MOTORIZED_PLATFORM_MDF_7_DEPTH)


with BuildPart() as body_8:
    # Motorized Platform MDF 8 outline → Motorized Platform MDF 8 (new body)
    with BuildSketch(Plane(origin=(0, 0, 0), x_dir=(1, 0, 0), z_dir=(0, 1, 0)).offset(MOTORIZED_START)):
        with BuildLine():
            Line((-105.264377579, 57.234813479), (-96.797710913, 57.234813479))
            ThreePointArc((-96.797710913, 57.234813479), (-109.497710913, 69.934813479), (-122.197710913, 57.234813479))
            Line((-122.197710913, 57.234813479), (-113.731044246, 57.234813479))
            Line((-113.731044246, 57.234813479), (-113.731044246, 50.884813479))
            Line((-113.731044246, 50.884813479), (-105.264377579, 50.884813479))
            Line((-105.264377579, 50.884813479), (-105.264377579, 57.234813479))
        make_face()
    extrude(amount=MOTORIZED_PLATFORM_MDF_8_DEPTH)


with BuildPart() as body_9:
    # Motorized Platform MDF 9 outline → Motorized Platform MDF 9 (new body)
    with BuildSketch(Plane(origin=(0, 0, 0), x_dir=(1, 0, 0), z_dir=(0, 1, 0)).offset(MOTORIZED_START)):
        with BuildLine():
            Line((-206.864377579, 57.234813479), (-198.397710913, 57.234813479))
            ThreePointArc((-198.397710913, 57.234813479), (-211.097710913, 69.934813479), (-223.797710913, 57.234813479))
            Line((-223.797710913, 57.234813479), (-215.331044246, 57.234813479))
            Line((-215.331044246, 57.234813479), (-215.331044246, 50.884813479))
            Line((-215.331044246, 50.884813479), (-206.864377579, 50.884813479))
            Line((-206.864377579, 50.884813479), (-206.864377579, 57.234813479))
        make_face()
    extrude(amount=MOTORIZED_PLATFORM_MDF_9_DEPTH)


with BuildPart() as body_4_1:
    # Body-Move/Copy1: moved
    add(body_4.part.moved(Location((283.308205777, 0, 0))))


with BuildPart() as body_3_1:
    # Body-Move/Copy1: moved
    add(body_3.part.moved(Location((283.308205777, 0, 0))))


with BuildPart() as body_2_1:
    # Body-Move/Copy2: moved
    add(body_2.part.moved(Location((0, 0, 46.115253355))))


with BuildPart() as body_4_2:
    # Body-Move/Copy2: moved
    add(body_4_1.part.moved(Location((0, 0, 46.115253355))))


with BuildPart() as body_4_3:
    # Body-Move/Copy3: moved
    add(body_4_2.part.moved(Location((13.847893126, 0, 0))))


with BuildPart() as body_2_2:
    # Body-Move/Copy4: moved
    add(body_2_1.part.moved(Location((-15.395150419, 0, 0))))


solid = Compound([part.part, body_3_1.part, body_4_3.part, body_2_2.part])
